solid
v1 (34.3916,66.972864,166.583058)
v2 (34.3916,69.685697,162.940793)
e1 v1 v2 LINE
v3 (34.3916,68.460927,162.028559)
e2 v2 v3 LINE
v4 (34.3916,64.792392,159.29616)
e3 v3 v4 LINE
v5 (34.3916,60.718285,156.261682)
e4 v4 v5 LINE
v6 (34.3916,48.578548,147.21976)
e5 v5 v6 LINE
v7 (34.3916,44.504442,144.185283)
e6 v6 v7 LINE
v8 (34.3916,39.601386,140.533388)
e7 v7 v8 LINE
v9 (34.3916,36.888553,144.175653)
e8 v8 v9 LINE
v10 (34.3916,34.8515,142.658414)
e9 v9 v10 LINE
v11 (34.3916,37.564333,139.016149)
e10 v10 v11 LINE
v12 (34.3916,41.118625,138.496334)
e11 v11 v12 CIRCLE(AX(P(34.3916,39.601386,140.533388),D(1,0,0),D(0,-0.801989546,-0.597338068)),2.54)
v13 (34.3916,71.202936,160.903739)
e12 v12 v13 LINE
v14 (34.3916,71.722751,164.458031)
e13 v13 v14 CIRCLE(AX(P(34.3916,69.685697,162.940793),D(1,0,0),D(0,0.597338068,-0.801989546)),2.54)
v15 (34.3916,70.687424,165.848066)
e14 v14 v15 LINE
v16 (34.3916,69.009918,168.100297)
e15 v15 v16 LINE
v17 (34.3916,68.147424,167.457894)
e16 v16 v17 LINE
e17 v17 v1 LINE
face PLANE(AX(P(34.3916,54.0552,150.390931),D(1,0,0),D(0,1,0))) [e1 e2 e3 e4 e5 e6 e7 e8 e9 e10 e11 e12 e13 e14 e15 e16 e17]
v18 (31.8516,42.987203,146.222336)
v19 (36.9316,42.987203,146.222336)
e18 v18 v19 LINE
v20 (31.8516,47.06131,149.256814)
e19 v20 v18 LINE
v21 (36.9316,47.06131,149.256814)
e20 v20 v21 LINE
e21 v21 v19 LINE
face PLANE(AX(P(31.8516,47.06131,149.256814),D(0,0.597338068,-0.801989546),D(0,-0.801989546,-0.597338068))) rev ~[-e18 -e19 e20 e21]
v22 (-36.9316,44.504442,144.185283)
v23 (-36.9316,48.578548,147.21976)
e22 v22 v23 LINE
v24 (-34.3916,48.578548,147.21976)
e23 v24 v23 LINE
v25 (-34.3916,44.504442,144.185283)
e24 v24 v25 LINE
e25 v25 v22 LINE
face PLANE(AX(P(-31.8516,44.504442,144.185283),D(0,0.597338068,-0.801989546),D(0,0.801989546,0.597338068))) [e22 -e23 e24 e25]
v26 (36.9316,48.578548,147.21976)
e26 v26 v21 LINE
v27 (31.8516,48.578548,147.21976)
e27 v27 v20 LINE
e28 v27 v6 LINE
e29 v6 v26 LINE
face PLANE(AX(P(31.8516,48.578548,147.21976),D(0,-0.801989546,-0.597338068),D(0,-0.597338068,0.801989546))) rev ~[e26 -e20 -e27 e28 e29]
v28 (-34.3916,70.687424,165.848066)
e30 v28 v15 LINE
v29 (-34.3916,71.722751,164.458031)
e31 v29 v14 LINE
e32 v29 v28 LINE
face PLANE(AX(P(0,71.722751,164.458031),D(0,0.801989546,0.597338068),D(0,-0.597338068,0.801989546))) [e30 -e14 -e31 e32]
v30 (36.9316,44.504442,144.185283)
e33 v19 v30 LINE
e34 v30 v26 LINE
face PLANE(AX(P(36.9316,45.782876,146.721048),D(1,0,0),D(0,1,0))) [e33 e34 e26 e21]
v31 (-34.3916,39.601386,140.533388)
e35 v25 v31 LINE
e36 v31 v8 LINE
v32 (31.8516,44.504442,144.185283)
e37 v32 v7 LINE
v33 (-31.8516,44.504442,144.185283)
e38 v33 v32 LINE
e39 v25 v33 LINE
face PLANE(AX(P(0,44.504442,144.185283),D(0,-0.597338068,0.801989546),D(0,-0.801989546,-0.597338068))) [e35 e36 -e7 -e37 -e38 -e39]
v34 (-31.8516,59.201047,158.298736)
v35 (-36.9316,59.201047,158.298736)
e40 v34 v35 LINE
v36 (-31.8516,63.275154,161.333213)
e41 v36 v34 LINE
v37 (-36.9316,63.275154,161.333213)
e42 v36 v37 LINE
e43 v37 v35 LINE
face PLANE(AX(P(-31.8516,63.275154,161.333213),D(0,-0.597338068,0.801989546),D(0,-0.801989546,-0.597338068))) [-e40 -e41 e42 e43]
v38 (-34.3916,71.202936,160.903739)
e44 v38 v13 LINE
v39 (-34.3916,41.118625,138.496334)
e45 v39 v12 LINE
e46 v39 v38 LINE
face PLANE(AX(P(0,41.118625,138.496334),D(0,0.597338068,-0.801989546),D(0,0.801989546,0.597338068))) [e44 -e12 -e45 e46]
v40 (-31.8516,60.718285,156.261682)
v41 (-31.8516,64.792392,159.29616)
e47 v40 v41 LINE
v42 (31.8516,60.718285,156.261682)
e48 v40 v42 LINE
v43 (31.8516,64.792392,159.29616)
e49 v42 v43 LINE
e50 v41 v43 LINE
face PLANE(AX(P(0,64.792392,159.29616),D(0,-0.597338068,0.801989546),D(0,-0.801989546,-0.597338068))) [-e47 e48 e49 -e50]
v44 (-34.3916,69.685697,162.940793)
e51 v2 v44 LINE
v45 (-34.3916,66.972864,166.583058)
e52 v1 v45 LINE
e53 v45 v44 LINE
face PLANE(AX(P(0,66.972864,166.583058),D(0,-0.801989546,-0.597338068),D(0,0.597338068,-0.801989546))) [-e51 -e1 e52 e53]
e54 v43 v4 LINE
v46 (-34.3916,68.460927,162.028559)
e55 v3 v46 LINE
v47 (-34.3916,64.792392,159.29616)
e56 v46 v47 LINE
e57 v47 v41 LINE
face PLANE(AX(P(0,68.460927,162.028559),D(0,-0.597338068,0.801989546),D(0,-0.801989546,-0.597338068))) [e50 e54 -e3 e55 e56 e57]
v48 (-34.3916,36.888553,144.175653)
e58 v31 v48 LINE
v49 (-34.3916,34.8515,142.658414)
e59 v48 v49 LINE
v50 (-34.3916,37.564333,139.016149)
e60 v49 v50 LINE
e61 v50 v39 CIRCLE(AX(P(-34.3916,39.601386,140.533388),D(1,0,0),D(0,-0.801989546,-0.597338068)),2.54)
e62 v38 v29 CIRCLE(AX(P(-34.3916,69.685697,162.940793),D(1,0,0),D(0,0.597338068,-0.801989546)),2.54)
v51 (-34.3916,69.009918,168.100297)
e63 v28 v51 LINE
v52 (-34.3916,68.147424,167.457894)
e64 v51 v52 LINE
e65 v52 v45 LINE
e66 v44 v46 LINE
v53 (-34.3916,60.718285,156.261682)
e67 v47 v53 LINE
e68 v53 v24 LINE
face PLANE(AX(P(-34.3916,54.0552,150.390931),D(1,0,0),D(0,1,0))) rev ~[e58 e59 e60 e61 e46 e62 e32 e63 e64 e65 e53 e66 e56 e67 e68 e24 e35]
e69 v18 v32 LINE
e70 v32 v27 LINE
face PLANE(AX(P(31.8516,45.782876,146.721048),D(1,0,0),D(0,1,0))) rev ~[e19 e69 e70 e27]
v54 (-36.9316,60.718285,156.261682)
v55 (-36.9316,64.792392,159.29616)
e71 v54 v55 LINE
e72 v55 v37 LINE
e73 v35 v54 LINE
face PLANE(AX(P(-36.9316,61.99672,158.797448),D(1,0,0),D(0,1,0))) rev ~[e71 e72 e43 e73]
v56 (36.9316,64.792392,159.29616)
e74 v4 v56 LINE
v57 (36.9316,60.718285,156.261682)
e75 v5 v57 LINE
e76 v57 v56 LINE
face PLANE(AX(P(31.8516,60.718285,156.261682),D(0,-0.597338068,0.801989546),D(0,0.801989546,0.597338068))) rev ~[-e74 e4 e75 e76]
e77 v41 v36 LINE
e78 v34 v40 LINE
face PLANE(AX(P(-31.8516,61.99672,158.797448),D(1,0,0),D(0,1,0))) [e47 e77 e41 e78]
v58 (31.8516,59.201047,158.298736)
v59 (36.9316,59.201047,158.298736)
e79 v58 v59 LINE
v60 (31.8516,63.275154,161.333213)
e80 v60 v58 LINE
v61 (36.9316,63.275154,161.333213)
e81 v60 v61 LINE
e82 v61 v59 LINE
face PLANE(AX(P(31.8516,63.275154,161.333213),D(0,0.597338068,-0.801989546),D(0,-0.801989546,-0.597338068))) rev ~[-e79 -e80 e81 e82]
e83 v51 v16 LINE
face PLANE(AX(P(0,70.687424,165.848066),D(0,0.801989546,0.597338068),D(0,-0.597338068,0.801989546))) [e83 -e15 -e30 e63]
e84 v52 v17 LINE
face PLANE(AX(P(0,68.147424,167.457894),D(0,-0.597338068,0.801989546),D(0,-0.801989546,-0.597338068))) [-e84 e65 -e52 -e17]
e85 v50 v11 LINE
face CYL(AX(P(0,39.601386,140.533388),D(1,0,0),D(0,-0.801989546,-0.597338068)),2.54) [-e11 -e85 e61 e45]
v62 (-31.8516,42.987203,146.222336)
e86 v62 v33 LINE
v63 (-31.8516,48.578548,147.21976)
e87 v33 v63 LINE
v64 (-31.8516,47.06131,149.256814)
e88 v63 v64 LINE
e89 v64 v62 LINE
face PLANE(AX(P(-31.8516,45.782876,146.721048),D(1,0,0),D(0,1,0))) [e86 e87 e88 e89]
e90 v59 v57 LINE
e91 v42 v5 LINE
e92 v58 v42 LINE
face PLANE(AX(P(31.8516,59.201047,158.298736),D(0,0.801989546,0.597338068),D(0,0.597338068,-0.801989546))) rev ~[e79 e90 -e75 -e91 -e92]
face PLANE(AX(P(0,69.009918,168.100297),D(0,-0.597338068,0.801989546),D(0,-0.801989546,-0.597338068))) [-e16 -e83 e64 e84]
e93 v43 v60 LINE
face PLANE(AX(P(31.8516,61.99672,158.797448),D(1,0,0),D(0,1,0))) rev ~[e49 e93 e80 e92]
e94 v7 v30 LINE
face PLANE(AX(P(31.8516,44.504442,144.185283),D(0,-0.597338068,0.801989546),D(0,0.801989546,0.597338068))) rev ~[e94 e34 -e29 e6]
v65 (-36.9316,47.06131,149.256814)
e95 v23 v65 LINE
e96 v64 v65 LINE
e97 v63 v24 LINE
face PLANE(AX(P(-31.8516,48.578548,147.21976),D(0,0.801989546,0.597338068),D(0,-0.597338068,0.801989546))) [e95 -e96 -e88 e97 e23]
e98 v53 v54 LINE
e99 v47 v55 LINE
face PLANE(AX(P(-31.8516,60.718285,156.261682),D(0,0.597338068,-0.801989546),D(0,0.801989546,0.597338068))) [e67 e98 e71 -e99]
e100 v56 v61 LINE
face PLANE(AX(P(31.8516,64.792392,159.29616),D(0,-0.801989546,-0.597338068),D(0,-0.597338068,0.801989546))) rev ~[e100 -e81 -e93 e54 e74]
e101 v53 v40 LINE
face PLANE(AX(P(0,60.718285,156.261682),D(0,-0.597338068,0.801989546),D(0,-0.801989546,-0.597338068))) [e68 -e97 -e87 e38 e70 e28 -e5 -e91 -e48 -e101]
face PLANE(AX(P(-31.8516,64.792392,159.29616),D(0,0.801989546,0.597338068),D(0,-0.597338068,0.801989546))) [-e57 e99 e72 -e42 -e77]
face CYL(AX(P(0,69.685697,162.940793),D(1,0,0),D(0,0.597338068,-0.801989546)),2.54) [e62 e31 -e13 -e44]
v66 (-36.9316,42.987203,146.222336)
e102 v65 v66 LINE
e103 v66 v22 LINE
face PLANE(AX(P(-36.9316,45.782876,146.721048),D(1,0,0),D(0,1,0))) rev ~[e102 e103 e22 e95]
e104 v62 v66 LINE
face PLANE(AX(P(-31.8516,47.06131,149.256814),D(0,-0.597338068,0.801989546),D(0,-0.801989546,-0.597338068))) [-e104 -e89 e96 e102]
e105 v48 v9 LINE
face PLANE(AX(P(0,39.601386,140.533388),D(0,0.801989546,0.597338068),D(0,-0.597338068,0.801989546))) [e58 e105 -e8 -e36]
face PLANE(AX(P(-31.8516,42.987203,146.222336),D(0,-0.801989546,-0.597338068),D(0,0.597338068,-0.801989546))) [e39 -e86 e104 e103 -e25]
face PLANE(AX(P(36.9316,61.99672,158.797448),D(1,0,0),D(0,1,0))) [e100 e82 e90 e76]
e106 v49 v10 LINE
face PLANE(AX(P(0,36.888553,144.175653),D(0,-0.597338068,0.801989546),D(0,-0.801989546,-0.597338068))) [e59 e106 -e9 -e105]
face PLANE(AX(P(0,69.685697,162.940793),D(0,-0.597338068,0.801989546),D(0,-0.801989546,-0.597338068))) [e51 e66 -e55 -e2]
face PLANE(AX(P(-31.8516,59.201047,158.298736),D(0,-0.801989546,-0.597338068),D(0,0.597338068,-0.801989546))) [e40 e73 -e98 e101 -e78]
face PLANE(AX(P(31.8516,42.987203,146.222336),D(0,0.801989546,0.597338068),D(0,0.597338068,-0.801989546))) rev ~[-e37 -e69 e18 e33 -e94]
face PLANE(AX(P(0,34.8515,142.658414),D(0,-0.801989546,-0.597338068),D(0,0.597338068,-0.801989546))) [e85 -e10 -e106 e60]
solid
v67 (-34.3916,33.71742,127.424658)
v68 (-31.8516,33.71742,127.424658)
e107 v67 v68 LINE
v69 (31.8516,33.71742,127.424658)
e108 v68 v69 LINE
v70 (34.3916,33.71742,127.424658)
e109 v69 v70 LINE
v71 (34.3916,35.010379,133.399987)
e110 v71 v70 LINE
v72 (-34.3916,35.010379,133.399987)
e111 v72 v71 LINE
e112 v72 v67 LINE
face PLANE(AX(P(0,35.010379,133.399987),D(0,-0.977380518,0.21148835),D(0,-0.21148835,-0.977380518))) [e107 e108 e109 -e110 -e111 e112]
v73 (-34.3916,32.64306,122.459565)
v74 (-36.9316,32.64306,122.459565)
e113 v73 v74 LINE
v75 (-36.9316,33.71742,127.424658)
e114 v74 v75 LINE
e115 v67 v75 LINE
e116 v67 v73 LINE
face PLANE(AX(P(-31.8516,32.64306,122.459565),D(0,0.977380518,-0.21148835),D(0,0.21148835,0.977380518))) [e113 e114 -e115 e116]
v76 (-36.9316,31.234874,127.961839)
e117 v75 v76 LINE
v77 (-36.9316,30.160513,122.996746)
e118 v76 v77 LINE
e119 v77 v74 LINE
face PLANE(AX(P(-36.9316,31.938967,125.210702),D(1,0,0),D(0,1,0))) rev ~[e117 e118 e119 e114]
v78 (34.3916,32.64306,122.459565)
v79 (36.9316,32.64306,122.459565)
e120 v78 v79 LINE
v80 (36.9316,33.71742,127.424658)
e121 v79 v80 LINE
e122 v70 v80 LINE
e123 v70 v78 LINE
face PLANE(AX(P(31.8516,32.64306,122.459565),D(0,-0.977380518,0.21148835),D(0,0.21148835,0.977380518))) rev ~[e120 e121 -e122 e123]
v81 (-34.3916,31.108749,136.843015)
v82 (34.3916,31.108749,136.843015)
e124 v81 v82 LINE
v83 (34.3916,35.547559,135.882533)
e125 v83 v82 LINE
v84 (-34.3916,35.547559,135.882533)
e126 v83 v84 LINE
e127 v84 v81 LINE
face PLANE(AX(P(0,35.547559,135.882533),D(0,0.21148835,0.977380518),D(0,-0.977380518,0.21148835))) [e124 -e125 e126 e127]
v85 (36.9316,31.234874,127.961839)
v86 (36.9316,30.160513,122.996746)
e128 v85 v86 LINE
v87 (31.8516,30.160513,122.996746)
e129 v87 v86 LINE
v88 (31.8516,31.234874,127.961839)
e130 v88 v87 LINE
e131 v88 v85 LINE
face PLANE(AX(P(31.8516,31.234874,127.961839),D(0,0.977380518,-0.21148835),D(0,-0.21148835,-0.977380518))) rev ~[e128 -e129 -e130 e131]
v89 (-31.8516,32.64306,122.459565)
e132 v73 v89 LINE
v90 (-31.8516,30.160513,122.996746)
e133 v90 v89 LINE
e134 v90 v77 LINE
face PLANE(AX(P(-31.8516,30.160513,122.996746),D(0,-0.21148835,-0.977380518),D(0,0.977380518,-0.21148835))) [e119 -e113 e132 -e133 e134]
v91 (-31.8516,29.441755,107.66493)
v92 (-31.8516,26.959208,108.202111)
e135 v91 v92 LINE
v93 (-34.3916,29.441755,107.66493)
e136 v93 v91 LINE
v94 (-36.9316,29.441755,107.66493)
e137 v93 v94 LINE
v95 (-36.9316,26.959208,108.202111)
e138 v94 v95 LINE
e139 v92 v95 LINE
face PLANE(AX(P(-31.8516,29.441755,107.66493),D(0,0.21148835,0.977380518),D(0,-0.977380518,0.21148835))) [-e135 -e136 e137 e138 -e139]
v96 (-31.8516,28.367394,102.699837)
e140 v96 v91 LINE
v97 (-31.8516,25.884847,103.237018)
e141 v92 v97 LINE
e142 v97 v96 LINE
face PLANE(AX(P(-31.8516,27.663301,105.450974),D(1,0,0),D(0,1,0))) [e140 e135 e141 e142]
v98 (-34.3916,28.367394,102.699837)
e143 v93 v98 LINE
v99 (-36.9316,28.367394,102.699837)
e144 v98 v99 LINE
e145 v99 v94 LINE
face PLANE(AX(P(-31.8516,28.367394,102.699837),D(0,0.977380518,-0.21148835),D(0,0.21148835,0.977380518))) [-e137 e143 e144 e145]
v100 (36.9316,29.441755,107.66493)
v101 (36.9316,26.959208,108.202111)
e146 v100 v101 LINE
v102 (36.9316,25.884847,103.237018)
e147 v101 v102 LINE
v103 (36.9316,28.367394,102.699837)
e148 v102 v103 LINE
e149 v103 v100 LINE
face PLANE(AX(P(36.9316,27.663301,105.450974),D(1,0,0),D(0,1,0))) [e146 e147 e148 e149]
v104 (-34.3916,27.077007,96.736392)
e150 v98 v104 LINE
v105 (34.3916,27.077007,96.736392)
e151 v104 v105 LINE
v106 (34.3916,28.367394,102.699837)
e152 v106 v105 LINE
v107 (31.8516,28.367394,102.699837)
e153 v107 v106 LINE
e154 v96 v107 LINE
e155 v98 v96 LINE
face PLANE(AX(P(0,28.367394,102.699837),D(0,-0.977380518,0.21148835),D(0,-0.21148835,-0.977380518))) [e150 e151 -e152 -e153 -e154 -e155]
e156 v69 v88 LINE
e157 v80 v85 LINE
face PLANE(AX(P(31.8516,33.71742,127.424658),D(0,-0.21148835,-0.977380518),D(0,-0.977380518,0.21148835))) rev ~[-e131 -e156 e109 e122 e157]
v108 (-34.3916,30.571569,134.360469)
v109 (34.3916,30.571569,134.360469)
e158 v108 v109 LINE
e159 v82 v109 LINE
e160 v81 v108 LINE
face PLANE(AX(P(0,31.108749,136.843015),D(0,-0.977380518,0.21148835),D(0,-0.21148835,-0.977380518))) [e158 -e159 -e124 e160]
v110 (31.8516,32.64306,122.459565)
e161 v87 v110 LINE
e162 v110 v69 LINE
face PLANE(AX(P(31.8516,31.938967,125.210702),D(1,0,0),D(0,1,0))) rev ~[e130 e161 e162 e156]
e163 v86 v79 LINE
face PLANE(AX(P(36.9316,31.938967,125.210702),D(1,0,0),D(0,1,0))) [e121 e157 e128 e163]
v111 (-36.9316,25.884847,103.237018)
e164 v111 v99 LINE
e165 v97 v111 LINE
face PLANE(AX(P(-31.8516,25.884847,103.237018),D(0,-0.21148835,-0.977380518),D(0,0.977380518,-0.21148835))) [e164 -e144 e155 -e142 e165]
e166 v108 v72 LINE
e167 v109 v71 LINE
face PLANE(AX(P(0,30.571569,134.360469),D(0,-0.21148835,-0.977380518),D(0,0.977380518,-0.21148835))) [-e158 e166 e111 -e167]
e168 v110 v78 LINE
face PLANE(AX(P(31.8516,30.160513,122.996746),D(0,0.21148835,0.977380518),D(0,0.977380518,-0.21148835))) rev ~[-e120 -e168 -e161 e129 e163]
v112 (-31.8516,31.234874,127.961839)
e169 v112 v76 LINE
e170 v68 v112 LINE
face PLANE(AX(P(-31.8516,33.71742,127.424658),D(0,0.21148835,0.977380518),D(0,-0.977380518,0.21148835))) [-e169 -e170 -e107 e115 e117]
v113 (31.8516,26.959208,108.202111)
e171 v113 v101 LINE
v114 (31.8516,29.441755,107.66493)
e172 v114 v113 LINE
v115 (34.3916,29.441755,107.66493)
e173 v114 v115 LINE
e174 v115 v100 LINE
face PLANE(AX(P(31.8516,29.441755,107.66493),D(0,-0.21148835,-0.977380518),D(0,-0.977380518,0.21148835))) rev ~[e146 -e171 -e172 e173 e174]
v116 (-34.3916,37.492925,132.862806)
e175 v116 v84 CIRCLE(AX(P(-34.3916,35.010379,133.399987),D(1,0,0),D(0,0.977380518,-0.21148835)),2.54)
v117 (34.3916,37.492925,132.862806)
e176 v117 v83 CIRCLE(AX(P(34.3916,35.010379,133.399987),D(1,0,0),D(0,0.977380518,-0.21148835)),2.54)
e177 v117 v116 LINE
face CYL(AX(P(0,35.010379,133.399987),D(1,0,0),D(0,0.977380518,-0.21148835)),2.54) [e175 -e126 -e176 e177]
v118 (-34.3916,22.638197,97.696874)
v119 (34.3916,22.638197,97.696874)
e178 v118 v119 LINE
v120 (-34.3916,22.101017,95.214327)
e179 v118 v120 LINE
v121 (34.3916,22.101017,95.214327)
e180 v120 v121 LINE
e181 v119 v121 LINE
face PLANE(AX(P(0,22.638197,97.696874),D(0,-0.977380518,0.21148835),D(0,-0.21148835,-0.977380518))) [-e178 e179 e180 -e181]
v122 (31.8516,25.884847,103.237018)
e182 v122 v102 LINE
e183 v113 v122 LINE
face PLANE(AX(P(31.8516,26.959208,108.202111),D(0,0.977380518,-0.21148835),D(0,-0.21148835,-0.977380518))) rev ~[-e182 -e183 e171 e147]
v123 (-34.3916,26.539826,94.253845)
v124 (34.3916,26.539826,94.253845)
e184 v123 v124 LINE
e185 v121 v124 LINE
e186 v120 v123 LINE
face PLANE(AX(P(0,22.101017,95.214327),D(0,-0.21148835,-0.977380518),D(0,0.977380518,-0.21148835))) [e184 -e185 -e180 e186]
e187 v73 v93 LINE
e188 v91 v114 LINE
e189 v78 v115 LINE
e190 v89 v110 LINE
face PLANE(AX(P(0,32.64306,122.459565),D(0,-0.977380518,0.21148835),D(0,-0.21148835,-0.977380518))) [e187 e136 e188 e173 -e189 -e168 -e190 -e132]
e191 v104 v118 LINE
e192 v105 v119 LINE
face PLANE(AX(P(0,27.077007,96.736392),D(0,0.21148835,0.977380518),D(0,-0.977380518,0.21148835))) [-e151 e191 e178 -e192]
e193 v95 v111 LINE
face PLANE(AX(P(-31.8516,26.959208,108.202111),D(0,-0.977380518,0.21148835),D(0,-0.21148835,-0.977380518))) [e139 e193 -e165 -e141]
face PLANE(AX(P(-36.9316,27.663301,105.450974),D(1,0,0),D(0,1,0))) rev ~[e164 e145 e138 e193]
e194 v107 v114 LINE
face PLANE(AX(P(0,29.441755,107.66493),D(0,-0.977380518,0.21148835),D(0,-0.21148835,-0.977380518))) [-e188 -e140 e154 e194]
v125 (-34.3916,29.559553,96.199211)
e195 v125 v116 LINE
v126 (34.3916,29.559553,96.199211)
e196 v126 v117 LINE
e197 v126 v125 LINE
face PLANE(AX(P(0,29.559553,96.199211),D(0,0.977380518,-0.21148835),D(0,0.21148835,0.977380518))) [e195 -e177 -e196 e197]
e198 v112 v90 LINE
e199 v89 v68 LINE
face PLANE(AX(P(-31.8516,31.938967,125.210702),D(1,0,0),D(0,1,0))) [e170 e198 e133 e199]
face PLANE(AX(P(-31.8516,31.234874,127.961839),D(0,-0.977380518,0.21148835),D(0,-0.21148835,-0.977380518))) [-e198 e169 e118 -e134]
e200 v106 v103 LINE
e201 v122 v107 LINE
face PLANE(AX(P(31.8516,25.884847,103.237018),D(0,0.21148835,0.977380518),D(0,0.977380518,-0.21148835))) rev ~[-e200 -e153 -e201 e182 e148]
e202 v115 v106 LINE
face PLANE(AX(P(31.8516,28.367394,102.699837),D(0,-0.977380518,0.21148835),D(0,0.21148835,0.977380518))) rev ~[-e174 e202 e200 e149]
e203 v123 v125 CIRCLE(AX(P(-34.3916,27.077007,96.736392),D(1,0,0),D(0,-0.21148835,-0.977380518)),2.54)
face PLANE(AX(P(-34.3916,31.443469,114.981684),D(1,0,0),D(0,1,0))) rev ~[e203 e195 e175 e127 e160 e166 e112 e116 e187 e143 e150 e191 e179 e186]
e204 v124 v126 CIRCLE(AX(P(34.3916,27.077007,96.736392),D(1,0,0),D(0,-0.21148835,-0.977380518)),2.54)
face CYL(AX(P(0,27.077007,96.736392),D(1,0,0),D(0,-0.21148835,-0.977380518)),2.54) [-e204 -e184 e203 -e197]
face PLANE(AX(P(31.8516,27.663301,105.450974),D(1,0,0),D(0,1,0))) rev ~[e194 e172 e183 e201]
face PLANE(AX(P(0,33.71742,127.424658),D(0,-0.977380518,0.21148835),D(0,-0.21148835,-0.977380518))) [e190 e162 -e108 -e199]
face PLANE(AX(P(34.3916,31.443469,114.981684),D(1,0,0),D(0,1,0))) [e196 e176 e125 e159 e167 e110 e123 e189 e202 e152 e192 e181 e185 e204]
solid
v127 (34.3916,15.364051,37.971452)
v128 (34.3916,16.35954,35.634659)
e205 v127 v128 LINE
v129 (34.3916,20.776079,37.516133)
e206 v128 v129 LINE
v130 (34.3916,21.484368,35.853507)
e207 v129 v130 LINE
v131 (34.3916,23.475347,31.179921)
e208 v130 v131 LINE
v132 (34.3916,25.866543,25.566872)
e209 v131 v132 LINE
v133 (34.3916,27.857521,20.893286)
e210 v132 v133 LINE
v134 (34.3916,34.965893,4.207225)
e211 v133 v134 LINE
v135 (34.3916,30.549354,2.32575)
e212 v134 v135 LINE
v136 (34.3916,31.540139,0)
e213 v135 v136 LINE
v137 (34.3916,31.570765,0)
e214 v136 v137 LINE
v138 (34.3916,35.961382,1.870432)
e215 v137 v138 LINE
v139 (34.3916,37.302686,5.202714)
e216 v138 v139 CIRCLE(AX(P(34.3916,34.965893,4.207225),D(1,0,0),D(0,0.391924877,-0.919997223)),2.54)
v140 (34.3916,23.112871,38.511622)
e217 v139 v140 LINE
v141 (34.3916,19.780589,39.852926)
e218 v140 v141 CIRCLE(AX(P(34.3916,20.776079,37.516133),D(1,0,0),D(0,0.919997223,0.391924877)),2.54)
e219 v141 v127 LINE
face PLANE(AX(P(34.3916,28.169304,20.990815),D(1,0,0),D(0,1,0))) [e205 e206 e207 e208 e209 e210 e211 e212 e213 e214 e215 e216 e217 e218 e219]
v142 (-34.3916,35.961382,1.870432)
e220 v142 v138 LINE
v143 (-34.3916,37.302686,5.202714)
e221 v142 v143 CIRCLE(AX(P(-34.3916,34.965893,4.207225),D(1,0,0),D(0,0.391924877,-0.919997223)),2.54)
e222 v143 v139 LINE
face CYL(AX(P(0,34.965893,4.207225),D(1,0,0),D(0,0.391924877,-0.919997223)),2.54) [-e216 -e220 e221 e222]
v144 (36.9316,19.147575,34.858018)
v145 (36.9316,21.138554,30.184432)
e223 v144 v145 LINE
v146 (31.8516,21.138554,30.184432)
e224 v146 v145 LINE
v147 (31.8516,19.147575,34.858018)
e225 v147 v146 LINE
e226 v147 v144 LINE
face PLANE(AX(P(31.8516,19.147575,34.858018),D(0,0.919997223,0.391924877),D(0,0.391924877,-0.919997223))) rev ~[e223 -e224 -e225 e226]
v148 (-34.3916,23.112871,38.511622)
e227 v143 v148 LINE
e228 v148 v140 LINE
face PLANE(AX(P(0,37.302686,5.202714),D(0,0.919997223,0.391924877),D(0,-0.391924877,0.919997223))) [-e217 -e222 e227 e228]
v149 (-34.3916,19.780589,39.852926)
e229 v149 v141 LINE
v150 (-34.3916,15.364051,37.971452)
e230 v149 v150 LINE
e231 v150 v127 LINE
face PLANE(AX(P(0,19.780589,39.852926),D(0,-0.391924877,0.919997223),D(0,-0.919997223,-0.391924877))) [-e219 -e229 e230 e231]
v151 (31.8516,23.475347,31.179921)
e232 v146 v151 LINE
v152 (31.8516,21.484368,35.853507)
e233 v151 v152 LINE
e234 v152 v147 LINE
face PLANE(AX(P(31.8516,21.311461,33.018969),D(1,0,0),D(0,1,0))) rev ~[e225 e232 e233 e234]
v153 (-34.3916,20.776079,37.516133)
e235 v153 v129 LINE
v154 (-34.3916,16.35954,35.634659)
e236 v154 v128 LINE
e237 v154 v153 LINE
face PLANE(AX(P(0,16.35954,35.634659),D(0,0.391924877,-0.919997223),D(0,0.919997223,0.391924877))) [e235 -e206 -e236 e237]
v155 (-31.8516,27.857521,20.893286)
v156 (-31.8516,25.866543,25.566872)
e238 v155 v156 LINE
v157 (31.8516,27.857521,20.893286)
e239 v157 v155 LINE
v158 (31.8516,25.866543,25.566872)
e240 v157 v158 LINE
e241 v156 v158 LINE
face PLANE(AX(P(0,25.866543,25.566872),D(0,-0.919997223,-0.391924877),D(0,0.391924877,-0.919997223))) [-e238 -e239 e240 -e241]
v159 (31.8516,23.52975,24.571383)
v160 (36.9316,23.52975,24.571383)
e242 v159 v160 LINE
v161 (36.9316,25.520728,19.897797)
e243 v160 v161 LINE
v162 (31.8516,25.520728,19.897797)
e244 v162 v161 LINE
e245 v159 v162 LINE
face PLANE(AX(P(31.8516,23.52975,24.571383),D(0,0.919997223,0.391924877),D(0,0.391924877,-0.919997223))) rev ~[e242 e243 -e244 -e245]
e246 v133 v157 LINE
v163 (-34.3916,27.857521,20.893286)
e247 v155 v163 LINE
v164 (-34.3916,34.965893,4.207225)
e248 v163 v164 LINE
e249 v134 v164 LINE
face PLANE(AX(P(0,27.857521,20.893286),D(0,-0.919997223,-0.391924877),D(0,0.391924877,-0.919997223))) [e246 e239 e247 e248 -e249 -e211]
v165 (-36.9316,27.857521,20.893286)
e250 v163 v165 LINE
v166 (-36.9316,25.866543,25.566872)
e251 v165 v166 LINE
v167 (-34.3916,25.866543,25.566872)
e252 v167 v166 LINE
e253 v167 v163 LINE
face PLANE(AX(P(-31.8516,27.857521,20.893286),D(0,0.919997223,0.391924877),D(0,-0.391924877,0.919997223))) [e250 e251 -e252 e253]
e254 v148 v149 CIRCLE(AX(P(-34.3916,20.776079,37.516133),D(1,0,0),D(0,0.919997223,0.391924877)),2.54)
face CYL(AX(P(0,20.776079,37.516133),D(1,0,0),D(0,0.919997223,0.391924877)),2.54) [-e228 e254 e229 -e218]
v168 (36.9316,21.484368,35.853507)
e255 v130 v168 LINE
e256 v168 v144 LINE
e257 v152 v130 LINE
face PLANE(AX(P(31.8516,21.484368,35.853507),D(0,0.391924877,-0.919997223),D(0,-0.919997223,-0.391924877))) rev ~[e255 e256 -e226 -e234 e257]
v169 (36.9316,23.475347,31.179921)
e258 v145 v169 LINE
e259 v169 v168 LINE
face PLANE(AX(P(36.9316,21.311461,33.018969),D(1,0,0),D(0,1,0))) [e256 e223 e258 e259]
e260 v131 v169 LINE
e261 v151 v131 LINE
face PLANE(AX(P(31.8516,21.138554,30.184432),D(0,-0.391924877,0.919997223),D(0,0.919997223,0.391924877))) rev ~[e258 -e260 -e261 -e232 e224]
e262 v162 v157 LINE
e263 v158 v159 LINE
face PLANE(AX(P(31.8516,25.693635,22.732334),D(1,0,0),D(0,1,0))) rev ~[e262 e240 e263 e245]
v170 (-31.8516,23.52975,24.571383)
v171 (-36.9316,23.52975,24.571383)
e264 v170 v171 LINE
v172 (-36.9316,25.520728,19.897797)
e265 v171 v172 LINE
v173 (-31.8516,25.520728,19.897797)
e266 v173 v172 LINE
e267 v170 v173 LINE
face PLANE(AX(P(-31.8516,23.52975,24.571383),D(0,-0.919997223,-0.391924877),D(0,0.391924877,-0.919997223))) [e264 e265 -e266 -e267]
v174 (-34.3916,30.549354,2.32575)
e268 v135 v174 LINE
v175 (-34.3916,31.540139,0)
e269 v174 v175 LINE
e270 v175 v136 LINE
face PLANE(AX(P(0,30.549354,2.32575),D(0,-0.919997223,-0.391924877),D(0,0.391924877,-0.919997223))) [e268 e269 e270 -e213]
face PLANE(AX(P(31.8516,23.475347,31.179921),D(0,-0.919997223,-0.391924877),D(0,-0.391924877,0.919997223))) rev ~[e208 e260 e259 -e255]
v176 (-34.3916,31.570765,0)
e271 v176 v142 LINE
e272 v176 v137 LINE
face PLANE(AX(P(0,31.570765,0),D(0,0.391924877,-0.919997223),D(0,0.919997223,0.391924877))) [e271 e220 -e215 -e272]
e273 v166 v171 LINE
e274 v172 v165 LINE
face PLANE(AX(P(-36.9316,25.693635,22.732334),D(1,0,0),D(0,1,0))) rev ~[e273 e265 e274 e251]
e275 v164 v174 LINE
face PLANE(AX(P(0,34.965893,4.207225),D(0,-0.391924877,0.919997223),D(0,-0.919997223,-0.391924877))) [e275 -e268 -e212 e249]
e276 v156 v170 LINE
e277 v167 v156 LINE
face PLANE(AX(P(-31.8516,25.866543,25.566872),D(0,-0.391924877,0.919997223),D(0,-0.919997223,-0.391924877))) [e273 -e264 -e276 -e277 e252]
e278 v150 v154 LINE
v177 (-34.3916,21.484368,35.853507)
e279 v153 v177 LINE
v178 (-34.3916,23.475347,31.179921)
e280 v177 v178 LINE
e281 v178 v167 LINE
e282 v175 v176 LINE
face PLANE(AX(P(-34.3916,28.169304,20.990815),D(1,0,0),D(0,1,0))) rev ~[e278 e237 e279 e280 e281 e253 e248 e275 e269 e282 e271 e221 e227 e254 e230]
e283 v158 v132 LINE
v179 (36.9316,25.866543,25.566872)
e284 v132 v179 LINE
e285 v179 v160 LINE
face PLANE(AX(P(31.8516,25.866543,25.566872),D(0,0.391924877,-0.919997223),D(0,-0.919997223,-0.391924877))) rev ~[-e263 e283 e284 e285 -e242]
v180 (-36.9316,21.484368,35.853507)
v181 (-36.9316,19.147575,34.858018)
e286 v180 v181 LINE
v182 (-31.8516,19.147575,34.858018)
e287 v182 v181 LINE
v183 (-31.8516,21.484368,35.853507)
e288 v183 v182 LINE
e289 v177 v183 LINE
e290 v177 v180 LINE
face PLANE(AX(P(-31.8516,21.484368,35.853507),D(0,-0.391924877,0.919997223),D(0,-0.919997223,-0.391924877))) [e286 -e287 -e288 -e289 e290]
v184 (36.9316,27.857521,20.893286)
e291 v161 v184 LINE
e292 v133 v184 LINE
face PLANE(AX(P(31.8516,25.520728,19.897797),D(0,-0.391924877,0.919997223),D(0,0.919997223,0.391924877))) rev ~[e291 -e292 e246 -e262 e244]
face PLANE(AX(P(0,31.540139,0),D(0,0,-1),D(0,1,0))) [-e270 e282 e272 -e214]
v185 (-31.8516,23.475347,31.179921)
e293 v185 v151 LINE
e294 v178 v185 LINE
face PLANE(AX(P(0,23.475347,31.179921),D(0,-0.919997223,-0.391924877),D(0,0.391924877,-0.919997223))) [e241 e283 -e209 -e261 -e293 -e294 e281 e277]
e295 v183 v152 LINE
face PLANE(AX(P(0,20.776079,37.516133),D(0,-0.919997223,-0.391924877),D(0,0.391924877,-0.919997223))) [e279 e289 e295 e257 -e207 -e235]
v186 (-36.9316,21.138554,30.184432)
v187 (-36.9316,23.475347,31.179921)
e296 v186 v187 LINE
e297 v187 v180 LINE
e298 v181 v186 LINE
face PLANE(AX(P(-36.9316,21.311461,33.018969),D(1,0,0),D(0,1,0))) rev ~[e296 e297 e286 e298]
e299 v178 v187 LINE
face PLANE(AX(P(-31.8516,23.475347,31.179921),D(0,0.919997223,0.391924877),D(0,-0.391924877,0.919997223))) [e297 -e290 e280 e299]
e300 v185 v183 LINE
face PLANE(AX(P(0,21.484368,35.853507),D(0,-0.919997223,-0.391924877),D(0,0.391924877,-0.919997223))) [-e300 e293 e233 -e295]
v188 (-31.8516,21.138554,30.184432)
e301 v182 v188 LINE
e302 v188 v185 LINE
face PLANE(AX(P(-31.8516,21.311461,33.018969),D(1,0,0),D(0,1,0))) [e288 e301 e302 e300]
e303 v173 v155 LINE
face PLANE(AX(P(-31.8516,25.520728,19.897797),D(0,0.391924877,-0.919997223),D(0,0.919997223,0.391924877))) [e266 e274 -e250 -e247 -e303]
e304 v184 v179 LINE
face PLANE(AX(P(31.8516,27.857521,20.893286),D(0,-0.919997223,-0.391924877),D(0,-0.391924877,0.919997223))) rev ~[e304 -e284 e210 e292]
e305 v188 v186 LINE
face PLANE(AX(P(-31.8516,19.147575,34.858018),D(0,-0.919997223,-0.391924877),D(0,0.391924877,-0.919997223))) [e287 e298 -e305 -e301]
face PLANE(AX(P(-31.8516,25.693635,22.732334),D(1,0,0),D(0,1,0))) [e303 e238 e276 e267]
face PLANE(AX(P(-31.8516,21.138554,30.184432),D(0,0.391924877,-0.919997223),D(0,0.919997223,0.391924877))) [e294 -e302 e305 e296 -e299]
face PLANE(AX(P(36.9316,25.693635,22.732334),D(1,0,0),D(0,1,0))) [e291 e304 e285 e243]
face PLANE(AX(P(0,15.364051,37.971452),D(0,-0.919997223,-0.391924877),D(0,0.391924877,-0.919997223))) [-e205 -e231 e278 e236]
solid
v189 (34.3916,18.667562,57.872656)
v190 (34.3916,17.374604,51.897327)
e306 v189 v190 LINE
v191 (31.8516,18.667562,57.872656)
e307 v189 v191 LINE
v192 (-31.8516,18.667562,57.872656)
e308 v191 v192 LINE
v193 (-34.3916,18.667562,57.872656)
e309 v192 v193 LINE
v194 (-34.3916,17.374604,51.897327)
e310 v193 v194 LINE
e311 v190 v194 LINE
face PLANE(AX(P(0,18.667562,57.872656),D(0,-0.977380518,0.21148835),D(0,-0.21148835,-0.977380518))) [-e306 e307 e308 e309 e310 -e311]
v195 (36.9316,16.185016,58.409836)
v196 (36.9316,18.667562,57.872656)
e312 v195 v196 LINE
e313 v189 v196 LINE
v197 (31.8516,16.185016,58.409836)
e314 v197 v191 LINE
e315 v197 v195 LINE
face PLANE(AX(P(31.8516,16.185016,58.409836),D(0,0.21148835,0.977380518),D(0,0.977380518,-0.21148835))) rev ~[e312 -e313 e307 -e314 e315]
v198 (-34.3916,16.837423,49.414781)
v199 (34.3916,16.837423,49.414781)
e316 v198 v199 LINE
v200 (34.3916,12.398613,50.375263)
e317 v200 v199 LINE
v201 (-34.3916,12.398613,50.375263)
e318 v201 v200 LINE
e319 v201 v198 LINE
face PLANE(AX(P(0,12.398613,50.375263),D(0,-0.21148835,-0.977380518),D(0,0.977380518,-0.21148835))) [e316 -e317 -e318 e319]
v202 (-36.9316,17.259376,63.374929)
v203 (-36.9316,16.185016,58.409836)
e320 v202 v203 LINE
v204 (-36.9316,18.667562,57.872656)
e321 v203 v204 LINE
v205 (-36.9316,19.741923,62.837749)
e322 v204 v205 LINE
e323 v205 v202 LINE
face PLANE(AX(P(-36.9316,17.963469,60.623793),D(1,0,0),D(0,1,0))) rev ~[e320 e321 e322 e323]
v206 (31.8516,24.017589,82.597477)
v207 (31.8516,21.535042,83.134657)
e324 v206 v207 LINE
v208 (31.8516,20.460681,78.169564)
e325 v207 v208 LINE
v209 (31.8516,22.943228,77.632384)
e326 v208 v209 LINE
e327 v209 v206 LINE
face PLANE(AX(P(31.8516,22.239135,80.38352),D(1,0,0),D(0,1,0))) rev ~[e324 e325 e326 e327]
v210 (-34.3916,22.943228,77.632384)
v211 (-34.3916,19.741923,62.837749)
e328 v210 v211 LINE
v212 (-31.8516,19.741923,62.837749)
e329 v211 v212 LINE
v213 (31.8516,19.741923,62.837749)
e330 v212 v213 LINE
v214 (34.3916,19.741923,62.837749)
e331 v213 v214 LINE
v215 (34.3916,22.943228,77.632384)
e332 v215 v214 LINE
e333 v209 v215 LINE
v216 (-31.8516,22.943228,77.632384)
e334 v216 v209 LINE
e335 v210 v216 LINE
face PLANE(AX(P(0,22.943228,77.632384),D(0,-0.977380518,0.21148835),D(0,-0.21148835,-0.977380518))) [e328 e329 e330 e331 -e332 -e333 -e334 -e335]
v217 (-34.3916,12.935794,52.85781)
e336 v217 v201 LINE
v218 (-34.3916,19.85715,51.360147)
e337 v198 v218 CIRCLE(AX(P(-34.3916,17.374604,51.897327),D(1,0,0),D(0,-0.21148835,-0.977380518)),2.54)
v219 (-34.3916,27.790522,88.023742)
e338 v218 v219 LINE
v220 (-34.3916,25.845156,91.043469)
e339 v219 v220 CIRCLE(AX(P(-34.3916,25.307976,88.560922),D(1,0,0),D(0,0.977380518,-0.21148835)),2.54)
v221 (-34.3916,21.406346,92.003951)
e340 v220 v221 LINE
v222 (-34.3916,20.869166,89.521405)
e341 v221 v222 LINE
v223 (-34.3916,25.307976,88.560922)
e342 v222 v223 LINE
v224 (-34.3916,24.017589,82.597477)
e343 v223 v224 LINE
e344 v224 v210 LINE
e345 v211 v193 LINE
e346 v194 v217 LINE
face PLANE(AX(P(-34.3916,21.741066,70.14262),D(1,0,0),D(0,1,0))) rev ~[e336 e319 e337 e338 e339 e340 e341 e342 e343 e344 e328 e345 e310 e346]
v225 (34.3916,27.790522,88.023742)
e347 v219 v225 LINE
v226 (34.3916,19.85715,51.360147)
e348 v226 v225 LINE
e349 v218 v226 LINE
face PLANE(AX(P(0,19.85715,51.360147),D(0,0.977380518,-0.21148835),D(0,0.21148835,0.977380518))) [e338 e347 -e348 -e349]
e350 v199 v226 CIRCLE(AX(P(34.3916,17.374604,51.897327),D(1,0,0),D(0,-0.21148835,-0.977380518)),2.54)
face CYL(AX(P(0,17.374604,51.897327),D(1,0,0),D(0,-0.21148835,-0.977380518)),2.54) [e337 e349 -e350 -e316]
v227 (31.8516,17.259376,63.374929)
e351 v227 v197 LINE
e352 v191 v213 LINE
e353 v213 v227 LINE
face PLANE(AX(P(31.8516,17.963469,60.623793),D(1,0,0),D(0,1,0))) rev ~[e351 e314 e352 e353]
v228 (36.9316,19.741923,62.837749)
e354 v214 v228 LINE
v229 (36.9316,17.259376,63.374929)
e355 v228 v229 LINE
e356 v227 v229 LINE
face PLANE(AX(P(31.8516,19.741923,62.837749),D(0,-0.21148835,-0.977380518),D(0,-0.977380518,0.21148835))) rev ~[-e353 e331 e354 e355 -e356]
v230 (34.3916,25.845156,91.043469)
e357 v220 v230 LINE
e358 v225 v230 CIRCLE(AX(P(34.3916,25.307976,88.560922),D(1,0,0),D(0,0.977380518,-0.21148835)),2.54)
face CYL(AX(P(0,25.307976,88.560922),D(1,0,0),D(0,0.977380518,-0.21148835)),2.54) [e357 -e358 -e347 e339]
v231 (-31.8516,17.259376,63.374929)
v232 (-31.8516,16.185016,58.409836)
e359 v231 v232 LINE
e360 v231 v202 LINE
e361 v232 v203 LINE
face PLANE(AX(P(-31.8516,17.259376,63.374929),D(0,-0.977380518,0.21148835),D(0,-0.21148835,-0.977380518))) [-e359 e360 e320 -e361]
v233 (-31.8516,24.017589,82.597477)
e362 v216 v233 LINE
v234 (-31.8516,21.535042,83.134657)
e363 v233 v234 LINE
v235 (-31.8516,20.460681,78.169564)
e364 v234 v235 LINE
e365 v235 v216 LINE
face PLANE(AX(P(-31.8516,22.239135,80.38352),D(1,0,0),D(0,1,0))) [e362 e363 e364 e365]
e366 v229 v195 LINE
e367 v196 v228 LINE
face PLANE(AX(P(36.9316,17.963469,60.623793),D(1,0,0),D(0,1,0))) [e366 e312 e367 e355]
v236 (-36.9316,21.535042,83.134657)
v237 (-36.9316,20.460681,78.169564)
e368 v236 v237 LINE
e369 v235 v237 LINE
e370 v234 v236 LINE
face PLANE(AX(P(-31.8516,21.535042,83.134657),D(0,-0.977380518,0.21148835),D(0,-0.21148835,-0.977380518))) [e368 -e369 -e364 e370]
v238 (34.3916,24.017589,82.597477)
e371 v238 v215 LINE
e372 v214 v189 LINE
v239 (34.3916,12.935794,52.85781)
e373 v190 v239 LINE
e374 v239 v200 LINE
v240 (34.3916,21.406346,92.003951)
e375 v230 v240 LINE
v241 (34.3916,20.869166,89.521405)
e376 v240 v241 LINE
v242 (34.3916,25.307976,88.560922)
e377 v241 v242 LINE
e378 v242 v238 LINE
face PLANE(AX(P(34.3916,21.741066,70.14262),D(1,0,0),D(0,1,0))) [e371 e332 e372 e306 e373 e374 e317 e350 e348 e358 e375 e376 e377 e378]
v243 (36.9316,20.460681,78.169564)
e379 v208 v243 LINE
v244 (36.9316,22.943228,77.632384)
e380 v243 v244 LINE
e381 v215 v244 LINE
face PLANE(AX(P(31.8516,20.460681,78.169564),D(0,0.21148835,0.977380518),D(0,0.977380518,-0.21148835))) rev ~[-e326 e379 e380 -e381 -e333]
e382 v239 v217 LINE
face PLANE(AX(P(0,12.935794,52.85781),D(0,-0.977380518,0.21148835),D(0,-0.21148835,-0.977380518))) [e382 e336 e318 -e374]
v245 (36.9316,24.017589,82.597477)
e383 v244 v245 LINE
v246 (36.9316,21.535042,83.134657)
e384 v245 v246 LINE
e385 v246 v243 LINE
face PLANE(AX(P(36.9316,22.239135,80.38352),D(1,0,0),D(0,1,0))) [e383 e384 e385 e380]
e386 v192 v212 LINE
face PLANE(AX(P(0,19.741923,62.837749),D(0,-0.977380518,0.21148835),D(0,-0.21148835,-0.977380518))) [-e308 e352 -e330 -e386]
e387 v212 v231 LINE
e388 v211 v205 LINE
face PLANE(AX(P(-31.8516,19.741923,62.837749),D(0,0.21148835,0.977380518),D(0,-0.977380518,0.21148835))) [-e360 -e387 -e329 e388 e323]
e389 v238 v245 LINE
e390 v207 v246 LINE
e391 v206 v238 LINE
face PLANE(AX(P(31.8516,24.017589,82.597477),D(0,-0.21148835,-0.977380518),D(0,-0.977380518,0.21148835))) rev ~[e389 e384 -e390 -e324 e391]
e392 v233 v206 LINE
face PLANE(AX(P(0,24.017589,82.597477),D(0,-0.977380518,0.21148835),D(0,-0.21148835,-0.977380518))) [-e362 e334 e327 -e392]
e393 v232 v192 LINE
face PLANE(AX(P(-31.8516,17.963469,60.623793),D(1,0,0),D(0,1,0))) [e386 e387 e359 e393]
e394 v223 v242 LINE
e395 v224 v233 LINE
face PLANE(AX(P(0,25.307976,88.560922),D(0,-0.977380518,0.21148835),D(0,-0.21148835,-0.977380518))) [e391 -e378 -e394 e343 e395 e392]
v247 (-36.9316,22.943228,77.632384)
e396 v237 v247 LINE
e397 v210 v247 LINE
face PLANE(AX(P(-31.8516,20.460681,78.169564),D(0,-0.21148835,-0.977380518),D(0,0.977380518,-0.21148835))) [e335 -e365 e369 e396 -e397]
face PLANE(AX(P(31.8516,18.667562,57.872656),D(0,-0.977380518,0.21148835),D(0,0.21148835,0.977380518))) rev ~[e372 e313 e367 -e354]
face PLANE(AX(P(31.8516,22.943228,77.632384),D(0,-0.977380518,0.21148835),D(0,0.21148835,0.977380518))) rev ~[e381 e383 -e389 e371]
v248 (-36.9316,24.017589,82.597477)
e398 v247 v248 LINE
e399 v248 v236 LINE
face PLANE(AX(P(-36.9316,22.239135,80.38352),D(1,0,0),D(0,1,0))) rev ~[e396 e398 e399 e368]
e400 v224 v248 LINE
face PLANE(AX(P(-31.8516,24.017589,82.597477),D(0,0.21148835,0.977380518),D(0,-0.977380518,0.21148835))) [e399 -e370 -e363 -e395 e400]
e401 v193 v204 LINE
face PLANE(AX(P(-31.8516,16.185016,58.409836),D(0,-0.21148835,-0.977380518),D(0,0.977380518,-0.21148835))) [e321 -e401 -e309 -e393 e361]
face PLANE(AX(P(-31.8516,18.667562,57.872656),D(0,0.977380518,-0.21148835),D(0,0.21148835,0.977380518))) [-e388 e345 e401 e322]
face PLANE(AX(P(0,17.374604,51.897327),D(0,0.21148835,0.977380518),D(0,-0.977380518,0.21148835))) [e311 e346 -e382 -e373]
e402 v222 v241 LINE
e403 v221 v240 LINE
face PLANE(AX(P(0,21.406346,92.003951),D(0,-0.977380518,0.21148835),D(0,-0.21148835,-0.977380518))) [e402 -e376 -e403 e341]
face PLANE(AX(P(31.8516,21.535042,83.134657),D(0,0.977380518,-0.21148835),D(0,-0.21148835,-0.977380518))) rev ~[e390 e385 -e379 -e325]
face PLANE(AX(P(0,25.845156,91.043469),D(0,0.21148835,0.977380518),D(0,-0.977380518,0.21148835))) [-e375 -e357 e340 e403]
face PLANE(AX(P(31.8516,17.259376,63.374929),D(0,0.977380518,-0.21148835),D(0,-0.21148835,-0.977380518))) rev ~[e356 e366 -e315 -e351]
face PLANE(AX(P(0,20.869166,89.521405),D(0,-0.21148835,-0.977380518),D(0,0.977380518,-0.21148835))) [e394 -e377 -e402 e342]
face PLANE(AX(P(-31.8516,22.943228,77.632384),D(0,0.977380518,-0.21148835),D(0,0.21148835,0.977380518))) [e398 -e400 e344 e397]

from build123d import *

# Parameters (mm, degrees)
F1_DEPTH = 34.3916
F2_START = 31.8516
F2_DEPTH = 5.08
F3_START = -31.8516
F3_DEPTH = 5.08


with BuildPart() as f1:
    # F0 (on Right) → F1 (new body, symmetric)
    with BuildSketch(Plane.YZ):
        with BuildLine():
            Line((35.5475592049, 135.882533211), (31.1087493632, 136.8430153909))
            Line((31.1087493632, 136.8430153909), (30.5715689534, 134.3604688743))
            Line((30.5715689534, 134.3604688743), (35.010378795, 133.3999866944))
            Line((35.010378795, 133.3999866944), (33.7174203827, 127.4246582133))
            Line((33.7174203827, 127.4246582133), (32.643059563, 122.45956518))
            Line((32.643059563, 122.45956518), (29.4417548033, 107.6649303911))
            Line((29.4417548033, 107.6649303911), (28.3673939836, 102.6998373579))
            Line((28.3673939836, 102.6998373579), (27.077006821, 96.7363917505))
            Line((27.077006821, 96.7363917505), (22.6381969794, 97.6968739305))
            Line((22.6381969794, 97.6968739305), (22.1010165695, 95.2143274138))
            Line((22.1010165695, 95.2143274138), (26.5398264112, 94.2538452339))
            ThreePointArc((26.5398264112, 94.2538452339), (28.452588387, 94.6011223635), (29.5595533377, 96.1992113407))
            Line((29.5595533377, 96.1992113407), (37.4929253116, 132.8628062845))
            ThreePointArc((37.4929253116, 132.8628062845), (37.1456481821, 134.7755682604), (35.5475592049, 135.882533211))
        make_face()
    extrude(amount=F1_DEPTH, both=True)

    # F0 (on Right) → F2, piece 2 (join)
    with BuildSketch(Plane.YZ.offset(F2_START)):
        Polygon((32.643059563, 122.45956518), (33.7174203827, 127.4246582133), (31.2348738661, 127.9618386231), (30.1605130463, 122.9967455899), align=None)
        Polygon((25.884847467, 103.2370177677), (28.3673939836, 102.6998373579), (29.4417548033, 107.6649303911), (26.9592082867, 108.202110801), align=None)
    extrude(amount=F2_DEPTH)

    # F0 (on Right) → F3, piece 2 (join)
    with BuildSketch(Plane.YZ.offset(F3_START)):
        Polygon((32.643059563, 122.45956518), (33.7174203827, 127.4246582133), (31.2348738661, 127.9618386231), (30.1605130463, 122.9967455899), align=None)
        Polygon((25.884847467, 103.2370177677), (28.3673939836, 102.6998373579), (29.4417548033, 107.6649303911), (26.9592082867, 108.202110801), align=None)
    extrude(amount=-F3_DEPTH)


with BuildPart() as f1b:
    # F0 (on Right) → F1, piece 2 (new body, symmetric)
    with BuildSketch(Plane.YZ):
        with BuildLine():
            Line((12.9357939022, 52.8578095868), (12.3986134924, 50.3752630702))
            Line((12.3986134924, 50.3752630702), (16.837423334, 49.4147808903))
            ThreePointArc((16.837423334, 49.4147808903), (18.7501853099, 49.7620580199), (19.8571502605, 51.3601469971))
            Line((19.8571502605, 51.3601469971), (27.7905222345, 88.0237419409))
            ThreePointArc((27.7905222345, 88.0237419409), (27.4432451049, 89.9365039168), (25.8451561277, 91.0434688674))
            Line((25.8451561277, 91.0434688674), (21.4063462861, 92.0039510473))
            Line((21.4063462861, 92.0039510473), (20.8691658762, 89.5214045307))
            Line((20.8691658762, 89.5214045307), (25.3079757178, 88.5609223508))
            Line((25.3079757178, 88.5609223508), (24.0175885553, 82.5974767434))
            Line((24.0175885553, 82.5974767434), (22.9432277355, 77.6323837102))
            Line((22.9432277355, 77.6323837102), (19.7419229759, 62.8377489213))
            Line((19.7419229759, 62.8377489213), (18.6675621562, 57.872655888))
            Line((18.6675621562, 57.872655888), (17.3746037439, 51.8973274069))
            Line((17.3746037439, 51.8973274069), (12.9357939022, 52.8578095868))
        make_face()
    extrude(amount=F1_DEPTH, both=True)

    # F0 (on Right) → F2, piece 3 (join)
    with BuildSketch(Plane.YZ.offset(F2_START)):
        Polygon((16.1850156395, 58.4098362979), (18.6675621562, 57.872655888), (19.7419229759, 62.8377489213), (17.2593764593, 63.3749293312), align=None)
        Polygon((22.9432277355, 77.6323837102), (24.0175885553, 82.5974767434), (21.5350420386, 83.1346571533), (20.4606812189, 78.16956412), align=None)
    extrude(amount=F2_DEPTH)

    # F0 (on Right) → F3, piece 3 (join)
    with BuildSketch(Plane.YZ.offset(F3_START)):
        Polygon((22.9432277355, 77.6323837102), (24.0175885553, 82.5974767434), (21.5350420386, 83.1346571533), (20.4606812189, 78.16956412), align=None)
        Polygon((16.1850156395, 58.4098362979), (18.6675621562, 57.872655888), (19.7419229759, 62.8377489213), (17.2593764593, 63.3749293312), align=None)
    extrude(amount=-F3_DEPTH)


with BuildPart() as f1c:
    # F0 (on Right) → F1, piece 3 (new body, symmetric)
    with BuildSketch(Plane.YZ):
        with BuildLine():
            Line((30.5493542935, 2.3257501254), (31.5401391658, 0))
            Line((31.5401391658, 0), (31.5707651968, 0))
            Line((31.5707651968, 0), (35.9613821509, 1.8704317419))
            ThreePointArc((35.9613821509, 1.8704317419), (37.3221722578, 3.2587797047), (37.302685911, 5.2027138762))
            Line((37.302685911, 5.2027138762), (23.1128714591, 38.5116224639))
            ThreePointArc((23.1128714591, 38.5116224639), (21.7245234962, 39.8724125708), (19.7805893247, 39.852926224))
            Line((19.7805893247, 39.852926224), (15.3640506544, 37.9714516603))
            Line((15.3640506544, 37.9714516603), (16.3595398415, 35.6346587131))
            Line((16.3595398415, 35.6346587131), (20.7760785118, 37.5161332768))
            Line((20.7760785118, 37.5161332768), (21.4843682503, 35.8535070154))
            Line((21.4843682503, 35.8535070154), (23.4753466245, 31.1799211209))
            Line((23.4753466245, 31.1799211209), (25.8665425285, 25.5668719827))
            Line((25.8665425285, 25.5668719827), (27.8575209028, 20.8932860882))
            Line((27.8575209028, 20.8932860882), (34.9658929638, 4.2072246891))
            Line((34.9658929638, 4.2072246891), (30.5493542935, 2.3257501254))
        make_face()
    extrude(amount=F1_DEPTH, both=True)

    # F0 (on Right) → F2, piece 4 (join)
    with BuildSketch(Plane.YZ.offset(F2_START)):
        Polygon((21.1385536773, 30.1844319338), (23.4753466245, 31.1799211209), (21.4843682503, 35.8535070154), (19.147575303, 34.8580178283), align=None)
        Polygon((25.5207279555, 19.8977969011), (27.8575209028, 20.8932860882), (25.8665425285, 25.5668719827), (23.5297495813, 24.5713827956), align=None)
    extrude(amount=F2_DEPTH)

    # F0 (on Right) → F3, piece 4 (join)
    with BuildSketch(Plane.YZ.offset(F3_START)):
        Polygon((25.5207279555, 19.8977969011), (27.8575209028, 20.8932860882), (25.8665425285, 25.5668719827), (23.5297495813, 24.5713827956), align=None)
        Polygon((21.1385536773, 30.1844319338), (23.4753466245, 31.1799211209), (21.4843682503, 35.8535070154), (19.147575303, 34.8580178283), align=None)
    extrude(amount=-F3_DEPTH)


with BuildPart() as f1d:
    # F0 (on Right) → F1, piece 4 (new body, symmetric)
    with BuildSketch(Plane.YZ):
        with BuildLine():
            ThreePointArc((70.6874244764, 164.5491375), (70.0510915867, 162.8675752701), (68.4609272063, 162.0285589874))
            Line((68.4609272063, 162.0285589874), (64.7923923036, 159.296159841))
            Line((64.7923923036, 159.296159841), (60.7182854085, 156.2616824549))
            Line((60.7182854085, 156.2616824549), (48.5785484084, 147.2197602993))
            Line((48.5785484084, 147.2197602993), (44.5044415132, 144.1852829132))
            Line((44.5044415132, 144.1852829132), (39.6013859607, 140.5333877666))
            Line((39.6013859607, 140.5333877666), (36.8885529895, 144.1756530093))
            Line((36.8885529895, 144.1756530093), (34.8514995419, 142.6584143163))
            Line((34.8514995419, 142.6584143163), (37.5643325131, 139.0161490735))
            ThreePointArc((37.5643325131, 139.0161490735), (39.2338214228, 138.0201236916), (41.1186246537, 138.496334319))
            Line((41.1186246537, 138.496334319), (71.2029360576, 160.9037391763))
            ThreePointArc((71.2029360576, 160.9037391763), (72.1989614395, 162.573228086), (71.7227508122, 164.4580313169))
            Line((71.7227508122, 164.4580313169), (70.6874244764, 165.8480664454))
            Line((70.6874244764, 165.8480664454), (70.6874244764, 164.5491375))
        make_face()
        with BuildLine():
            Line((69.6856973646, 162.9407926238), (68.4609272063, 162.0285589874))
            ThreePointArc((68.4609272063, 162.0285589874), (70.0510915867, 162.8675752701), (70.6874244764, 164.5491375))
            Line((70.6874244764, 164.5491375), (70.6874244764, 165.8480664454))
            Line((70.6874244764, 165.8480664454), (69.009917841, 168.1002965597))
            Line((69.009917841, 168.1002965597), (68.1474244764, 167.4578940214))
            Line((68.1474244764, 167.4578940214), (68.1474244764, 165.0060867035))
            Line((68.1474244764, 165.0060867035), (69.6856973646, 162.9407926238))
        make_face()
        Polygon((68.1474244764, 165.0060867035), (68.1474244764, 167.4578940214), (66.9728643934, 166.5830578666), align=None)
    extrude(amount=F1_DEPTH, both=True)

    # F0 (on Right) → F2 (join)
    with BuildSketch(Plane.YZ.offset(F2_START)):
        Polygon((60.7182854085, 156.2616824549), (64.7923923036, 159.296159841), (63.2751536106, 161.3332132886), (59.2010467154, 158.2987359025), align=None)
        Polygon((44.5044415132, 144.1852829132), (48.5785484084, 147.2197602993), (47.0613097153, 149.2568137468), (42.9872028202, 146.2223363607), align=None)
    extrude(amount=F2_DEPTH)

    # F0 (on Right) → F3 (join)
    with BuildSketch(Plane.YZ.offset(F3_START)):
        Polygon((60.7182854085, 156.2616824549), (64.7923923036, 159.296159841), (63.2751536106, 161.3332132886), (59.2010467154, 158.2987359025), align=None)
        Polygon((44.5044415132, 144.1852829132), (48.5785484084, 147.2197602993), (47.0613097153, 149.2568137468), (42.9872028202, 146.2223363607), align=None)
    extrude(amount=-F3_DEPTH)


solid = Compound([f1.part, f1b.part, f1c.part, f1d.part])
